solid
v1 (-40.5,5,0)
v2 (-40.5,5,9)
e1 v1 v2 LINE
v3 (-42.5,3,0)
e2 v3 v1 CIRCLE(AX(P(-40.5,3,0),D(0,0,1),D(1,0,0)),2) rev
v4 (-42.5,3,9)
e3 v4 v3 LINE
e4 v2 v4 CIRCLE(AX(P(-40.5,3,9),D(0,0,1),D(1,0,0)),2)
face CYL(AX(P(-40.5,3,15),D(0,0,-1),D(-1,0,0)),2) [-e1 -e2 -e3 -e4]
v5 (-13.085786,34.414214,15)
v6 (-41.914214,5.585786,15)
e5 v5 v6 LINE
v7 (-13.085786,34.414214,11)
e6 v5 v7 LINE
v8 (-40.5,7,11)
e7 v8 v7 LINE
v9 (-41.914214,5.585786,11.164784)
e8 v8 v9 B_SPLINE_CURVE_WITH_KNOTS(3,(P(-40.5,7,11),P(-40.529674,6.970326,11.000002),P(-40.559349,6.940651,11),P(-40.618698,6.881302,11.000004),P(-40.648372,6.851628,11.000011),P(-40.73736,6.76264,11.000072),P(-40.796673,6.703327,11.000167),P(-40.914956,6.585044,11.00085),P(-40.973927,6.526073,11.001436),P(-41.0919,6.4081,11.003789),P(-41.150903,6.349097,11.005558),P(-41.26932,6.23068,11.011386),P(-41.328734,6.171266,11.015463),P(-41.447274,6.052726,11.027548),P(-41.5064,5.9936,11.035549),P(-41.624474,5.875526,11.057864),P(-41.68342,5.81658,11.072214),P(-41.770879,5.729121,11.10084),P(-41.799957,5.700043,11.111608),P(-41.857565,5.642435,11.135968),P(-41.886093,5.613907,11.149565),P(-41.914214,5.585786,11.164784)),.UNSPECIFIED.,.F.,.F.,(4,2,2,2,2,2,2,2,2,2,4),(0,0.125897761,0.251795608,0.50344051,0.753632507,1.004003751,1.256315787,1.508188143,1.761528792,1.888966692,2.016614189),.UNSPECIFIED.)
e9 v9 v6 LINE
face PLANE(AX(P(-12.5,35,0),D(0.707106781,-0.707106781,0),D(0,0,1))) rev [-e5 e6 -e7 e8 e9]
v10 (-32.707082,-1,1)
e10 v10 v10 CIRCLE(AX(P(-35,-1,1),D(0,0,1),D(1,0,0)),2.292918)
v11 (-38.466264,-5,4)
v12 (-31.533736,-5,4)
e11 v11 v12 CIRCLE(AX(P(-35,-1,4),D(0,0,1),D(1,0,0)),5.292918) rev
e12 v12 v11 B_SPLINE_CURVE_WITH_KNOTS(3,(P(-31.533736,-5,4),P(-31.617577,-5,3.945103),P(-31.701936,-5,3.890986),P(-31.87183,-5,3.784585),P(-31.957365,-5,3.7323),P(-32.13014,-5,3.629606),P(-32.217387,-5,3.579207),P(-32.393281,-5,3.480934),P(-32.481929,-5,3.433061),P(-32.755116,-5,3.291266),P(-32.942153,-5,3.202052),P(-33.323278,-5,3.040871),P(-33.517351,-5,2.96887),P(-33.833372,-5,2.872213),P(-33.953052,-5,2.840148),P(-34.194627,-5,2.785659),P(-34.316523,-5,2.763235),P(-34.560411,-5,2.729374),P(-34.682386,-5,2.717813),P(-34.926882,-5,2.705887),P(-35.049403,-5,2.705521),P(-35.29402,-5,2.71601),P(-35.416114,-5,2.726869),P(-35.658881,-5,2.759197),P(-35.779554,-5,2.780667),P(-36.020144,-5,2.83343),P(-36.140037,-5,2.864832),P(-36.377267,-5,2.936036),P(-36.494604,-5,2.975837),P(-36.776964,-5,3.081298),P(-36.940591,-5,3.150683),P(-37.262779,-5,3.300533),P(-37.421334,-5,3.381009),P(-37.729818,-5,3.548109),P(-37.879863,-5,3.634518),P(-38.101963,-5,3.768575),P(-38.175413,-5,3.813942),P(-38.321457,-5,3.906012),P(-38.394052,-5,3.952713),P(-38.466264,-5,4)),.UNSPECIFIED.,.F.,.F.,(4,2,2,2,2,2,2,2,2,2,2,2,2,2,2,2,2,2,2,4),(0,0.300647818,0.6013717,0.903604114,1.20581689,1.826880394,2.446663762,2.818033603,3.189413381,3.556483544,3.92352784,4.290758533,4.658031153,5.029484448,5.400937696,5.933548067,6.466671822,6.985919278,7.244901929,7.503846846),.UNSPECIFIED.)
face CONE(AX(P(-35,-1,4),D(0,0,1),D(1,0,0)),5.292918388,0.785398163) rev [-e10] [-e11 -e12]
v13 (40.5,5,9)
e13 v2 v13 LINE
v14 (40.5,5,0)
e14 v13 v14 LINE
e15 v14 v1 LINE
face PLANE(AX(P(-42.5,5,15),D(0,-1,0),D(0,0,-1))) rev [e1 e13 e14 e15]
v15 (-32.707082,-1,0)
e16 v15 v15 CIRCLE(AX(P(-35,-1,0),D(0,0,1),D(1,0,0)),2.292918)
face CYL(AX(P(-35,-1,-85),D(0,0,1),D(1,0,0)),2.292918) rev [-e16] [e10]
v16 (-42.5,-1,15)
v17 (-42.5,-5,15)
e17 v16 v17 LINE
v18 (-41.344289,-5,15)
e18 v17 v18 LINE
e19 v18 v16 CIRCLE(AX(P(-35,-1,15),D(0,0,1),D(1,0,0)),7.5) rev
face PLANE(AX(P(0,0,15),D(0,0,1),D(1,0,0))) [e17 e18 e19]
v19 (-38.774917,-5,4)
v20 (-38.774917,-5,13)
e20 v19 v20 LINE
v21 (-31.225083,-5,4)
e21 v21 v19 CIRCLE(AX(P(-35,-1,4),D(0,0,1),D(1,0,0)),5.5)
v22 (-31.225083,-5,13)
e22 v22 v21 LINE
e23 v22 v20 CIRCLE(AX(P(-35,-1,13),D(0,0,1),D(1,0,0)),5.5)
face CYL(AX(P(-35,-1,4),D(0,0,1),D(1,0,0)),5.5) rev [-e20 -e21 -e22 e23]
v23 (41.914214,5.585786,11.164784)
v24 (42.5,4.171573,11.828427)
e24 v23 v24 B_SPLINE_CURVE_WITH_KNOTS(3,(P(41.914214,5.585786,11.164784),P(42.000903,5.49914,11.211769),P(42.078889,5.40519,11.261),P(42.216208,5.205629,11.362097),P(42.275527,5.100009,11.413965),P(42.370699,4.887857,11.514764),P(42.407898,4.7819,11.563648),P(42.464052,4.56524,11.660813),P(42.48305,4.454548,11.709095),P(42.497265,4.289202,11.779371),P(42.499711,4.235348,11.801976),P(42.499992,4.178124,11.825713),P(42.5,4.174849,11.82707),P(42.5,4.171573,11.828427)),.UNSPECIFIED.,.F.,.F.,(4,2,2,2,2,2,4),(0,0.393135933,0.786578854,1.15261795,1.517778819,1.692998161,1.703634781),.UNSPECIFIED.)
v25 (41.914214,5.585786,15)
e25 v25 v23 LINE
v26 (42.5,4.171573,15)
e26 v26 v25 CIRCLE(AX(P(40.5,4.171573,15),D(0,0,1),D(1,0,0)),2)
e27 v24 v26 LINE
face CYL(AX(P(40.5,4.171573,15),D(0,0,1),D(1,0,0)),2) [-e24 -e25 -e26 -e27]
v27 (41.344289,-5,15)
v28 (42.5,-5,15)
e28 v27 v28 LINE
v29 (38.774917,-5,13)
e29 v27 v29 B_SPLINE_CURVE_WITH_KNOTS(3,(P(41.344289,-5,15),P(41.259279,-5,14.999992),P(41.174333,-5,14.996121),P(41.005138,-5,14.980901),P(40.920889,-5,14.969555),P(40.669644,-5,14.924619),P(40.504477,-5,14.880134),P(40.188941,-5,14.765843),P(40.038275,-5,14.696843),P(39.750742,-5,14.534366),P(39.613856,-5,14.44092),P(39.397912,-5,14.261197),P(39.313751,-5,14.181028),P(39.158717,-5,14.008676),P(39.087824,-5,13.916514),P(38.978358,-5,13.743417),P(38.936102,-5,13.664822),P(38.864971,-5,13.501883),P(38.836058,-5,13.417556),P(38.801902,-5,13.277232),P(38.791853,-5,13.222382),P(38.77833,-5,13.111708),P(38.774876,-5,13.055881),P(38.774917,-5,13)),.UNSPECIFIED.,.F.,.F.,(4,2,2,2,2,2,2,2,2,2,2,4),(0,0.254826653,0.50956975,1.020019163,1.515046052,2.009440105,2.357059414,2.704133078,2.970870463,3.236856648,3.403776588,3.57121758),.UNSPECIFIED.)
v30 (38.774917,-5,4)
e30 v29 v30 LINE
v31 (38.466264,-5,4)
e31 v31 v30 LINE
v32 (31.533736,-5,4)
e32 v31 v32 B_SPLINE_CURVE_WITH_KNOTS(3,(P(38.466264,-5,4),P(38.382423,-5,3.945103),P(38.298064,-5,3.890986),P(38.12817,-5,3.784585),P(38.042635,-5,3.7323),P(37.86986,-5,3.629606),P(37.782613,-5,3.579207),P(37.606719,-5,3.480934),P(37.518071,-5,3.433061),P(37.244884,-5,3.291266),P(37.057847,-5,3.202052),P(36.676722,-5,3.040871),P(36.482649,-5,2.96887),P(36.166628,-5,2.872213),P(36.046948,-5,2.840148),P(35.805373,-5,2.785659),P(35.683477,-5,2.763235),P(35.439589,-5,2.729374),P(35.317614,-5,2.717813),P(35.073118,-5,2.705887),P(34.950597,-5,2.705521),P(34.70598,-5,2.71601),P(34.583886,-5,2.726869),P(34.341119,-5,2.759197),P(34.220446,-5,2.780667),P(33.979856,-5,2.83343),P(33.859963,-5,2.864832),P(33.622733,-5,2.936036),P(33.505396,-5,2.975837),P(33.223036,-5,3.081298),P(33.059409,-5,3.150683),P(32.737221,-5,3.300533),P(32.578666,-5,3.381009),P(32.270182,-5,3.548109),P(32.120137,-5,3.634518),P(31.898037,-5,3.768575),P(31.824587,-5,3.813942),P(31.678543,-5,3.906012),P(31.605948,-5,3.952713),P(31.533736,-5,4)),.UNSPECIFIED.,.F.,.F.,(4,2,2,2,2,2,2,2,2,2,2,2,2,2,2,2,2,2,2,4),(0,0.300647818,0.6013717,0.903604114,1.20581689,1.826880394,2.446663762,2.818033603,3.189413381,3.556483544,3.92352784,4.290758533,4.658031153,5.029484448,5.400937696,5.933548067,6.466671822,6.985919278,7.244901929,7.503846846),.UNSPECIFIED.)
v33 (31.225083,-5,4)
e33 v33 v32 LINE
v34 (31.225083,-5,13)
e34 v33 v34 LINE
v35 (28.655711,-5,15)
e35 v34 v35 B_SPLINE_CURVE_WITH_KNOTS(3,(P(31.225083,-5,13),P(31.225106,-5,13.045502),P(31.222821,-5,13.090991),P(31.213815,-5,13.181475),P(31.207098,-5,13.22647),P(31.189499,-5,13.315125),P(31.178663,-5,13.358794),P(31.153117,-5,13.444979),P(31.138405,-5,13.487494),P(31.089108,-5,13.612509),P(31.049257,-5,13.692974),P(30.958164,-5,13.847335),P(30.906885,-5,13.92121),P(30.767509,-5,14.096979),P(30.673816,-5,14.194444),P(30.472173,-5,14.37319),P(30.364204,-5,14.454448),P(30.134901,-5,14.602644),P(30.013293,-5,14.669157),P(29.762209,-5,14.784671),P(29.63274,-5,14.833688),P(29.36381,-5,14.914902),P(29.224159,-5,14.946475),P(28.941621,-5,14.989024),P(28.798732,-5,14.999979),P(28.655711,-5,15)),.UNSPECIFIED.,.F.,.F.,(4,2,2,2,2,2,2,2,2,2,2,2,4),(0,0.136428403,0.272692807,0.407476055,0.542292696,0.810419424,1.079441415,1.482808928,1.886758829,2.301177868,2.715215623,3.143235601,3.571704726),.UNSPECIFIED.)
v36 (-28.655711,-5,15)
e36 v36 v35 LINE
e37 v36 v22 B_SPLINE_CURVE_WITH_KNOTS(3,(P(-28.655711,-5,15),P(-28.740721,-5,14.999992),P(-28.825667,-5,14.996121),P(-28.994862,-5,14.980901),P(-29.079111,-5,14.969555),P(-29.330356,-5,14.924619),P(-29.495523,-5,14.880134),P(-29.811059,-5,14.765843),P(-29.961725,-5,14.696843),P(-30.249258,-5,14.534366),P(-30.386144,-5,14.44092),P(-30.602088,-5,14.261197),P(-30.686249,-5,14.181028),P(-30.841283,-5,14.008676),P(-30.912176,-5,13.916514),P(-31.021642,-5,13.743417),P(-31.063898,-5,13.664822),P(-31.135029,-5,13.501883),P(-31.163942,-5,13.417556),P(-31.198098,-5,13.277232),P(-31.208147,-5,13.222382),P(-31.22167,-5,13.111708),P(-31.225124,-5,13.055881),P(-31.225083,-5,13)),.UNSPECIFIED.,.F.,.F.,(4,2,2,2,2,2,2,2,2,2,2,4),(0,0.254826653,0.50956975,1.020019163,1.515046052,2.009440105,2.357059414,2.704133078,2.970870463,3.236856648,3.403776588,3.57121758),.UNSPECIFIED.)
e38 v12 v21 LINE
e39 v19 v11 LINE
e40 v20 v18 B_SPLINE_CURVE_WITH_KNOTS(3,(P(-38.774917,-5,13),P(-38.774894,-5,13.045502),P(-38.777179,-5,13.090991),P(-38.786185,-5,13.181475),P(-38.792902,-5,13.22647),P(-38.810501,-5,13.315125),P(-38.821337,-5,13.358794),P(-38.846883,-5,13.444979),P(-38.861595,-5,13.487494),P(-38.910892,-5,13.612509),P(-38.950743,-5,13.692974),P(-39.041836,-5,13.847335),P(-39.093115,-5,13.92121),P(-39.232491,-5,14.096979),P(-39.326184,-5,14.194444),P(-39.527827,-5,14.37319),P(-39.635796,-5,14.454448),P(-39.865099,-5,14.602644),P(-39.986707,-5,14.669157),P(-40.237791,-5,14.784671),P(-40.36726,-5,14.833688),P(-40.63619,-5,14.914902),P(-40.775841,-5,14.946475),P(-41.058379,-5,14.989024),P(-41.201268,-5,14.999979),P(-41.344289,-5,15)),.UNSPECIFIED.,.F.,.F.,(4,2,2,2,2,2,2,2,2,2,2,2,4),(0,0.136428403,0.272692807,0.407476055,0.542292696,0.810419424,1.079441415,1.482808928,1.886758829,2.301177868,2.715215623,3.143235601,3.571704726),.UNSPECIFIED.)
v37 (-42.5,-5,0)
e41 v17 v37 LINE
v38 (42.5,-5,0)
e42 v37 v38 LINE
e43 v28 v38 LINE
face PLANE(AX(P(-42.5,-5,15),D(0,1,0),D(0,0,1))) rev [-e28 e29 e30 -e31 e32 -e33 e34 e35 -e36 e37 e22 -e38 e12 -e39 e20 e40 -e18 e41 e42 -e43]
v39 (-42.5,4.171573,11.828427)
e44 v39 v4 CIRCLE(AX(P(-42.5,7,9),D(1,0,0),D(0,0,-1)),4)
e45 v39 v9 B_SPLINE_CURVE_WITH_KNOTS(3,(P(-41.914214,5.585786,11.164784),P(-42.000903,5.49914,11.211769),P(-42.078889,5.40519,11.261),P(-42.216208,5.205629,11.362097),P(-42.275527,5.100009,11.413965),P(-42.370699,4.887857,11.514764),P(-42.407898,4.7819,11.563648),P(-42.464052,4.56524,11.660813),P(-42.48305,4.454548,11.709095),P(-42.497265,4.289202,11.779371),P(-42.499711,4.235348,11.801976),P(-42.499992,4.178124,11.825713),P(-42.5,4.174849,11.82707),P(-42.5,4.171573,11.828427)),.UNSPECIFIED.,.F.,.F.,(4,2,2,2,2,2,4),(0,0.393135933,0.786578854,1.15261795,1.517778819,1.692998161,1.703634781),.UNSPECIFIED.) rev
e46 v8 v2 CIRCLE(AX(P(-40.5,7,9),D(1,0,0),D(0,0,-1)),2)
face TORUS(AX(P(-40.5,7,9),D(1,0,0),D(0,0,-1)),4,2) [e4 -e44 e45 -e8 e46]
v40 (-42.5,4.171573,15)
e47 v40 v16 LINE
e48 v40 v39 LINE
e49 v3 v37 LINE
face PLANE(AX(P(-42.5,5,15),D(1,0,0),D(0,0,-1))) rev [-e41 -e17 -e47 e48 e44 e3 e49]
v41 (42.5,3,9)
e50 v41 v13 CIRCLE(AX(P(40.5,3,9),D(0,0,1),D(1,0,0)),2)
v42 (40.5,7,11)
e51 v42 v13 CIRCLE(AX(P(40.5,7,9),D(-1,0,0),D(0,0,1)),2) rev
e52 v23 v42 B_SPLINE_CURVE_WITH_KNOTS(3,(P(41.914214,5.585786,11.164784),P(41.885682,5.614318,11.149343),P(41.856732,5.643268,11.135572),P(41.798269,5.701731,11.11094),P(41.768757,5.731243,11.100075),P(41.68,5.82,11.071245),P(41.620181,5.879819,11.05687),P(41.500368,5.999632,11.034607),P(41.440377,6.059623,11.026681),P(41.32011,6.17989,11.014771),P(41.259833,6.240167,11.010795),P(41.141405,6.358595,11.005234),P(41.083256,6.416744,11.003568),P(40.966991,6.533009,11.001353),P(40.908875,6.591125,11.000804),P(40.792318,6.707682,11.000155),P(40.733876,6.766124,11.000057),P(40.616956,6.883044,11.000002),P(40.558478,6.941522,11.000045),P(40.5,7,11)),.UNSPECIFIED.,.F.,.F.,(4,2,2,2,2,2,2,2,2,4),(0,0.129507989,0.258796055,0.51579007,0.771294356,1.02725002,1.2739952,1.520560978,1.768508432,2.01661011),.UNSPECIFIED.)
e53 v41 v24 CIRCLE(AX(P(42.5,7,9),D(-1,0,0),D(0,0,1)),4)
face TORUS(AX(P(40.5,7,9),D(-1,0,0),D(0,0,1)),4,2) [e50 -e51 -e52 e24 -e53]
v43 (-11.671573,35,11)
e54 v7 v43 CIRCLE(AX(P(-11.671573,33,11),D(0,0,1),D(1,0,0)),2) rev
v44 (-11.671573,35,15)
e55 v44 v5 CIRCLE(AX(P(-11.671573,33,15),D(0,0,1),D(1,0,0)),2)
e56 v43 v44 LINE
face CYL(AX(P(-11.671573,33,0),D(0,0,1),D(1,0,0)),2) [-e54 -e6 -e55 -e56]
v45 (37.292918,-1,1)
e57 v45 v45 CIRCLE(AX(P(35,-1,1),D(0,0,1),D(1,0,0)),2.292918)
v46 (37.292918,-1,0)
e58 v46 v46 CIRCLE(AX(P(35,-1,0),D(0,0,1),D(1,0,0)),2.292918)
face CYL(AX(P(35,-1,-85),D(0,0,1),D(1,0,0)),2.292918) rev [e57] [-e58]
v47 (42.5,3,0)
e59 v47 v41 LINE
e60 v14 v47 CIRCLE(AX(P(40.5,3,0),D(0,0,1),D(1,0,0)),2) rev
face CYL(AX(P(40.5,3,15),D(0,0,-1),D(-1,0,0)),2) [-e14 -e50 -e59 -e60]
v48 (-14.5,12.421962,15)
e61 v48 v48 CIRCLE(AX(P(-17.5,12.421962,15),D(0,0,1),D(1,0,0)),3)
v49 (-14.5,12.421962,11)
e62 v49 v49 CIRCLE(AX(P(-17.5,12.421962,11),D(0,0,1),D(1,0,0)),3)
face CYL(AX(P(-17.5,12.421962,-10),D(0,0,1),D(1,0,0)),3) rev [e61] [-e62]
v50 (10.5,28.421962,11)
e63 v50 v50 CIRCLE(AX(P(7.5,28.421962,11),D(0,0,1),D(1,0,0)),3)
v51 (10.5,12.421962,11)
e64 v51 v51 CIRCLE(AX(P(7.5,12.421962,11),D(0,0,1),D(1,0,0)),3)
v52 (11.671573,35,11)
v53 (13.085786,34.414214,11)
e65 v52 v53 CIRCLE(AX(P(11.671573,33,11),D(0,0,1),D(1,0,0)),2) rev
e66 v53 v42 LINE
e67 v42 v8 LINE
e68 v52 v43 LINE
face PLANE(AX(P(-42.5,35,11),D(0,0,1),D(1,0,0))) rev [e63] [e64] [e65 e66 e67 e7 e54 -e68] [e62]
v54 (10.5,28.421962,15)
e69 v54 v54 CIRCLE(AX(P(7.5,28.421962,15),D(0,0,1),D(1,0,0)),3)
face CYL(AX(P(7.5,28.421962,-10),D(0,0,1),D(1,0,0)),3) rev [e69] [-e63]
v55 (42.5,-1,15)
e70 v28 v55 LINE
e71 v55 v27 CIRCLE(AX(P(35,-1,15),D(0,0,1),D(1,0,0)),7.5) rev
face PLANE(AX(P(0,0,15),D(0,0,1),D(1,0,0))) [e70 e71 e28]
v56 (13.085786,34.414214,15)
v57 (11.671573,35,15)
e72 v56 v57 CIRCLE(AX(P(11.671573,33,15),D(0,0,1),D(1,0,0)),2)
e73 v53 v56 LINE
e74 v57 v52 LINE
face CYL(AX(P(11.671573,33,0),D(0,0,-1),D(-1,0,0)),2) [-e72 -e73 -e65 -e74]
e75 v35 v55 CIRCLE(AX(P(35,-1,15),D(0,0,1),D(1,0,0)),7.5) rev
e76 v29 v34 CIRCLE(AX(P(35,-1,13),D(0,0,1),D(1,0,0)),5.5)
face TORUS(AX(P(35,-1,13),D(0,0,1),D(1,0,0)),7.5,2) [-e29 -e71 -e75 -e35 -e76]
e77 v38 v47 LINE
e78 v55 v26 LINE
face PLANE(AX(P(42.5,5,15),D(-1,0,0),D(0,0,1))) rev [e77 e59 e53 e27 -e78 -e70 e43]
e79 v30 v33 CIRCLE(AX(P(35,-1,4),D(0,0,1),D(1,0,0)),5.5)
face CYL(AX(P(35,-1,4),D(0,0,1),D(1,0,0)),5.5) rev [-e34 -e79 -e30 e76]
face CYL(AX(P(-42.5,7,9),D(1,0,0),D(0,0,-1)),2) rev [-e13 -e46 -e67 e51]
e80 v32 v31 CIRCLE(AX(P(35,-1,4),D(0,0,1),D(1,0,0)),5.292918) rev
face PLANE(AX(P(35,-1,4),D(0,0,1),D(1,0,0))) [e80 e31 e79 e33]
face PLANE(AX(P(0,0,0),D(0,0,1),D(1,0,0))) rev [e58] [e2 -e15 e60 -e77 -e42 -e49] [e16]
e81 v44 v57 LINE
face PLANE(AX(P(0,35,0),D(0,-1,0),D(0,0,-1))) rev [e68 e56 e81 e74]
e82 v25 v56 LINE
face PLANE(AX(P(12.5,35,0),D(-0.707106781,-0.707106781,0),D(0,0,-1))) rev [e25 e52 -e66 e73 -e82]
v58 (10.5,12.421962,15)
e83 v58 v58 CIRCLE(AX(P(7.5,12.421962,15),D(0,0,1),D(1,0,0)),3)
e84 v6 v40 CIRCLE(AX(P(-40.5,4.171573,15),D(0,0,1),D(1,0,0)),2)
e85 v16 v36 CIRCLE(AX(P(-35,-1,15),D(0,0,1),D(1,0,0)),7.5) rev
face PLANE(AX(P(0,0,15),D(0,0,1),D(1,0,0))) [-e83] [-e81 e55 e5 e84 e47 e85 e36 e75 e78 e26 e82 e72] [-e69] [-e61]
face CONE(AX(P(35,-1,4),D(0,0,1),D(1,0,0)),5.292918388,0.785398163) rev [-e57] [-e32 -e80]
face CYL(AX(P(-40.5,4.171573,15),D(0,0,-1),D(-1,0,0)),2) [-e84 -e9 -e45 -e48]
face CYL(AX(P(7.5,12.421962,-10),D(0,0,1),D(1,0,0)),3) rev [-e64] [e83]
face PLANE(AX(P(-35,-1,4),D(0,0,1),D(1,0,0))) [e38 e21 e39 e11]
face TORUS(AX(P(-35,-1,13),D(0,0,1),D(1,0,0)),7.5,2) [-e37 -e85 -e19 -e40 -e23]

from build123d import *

# Parameters (mm, degrees)
SKETCH1_W           = 85
SKETCH1_H           = 10
BOSS_EXTRUDE1_DEPTH = 15
SKETCH3_R           = 2.292918
CUT_EXTRUDE1_DEPTH  = 100
LPATTERN1_COUNT     = 2
LPATTERN1_PITCH     = 70
SKETCH7_W           = 85
SKETCH7_H           = 4
BOSS_EXTRUDE5_DEPTH = 30
SKETCH8_R           = 3
CUT_EXTRUDE2_DEPTH  = 25
LPATTERN2_START     = 11
LPATTERN2_OUTLINE_R = 3
LPATTERN2_DEPTH     = 4
CHAMFER2_SIZE       = 30
FILLET3_START       = -1
FILLET3_DEPTH       = 10
FILLET3_START_2     = 1.5411
FILLET3_2_DEPTH     = 14.4589
FILLET3_START_3     = 9
FILLET3_3_DEPTH     = 2.164784
FILLET3_5_DEPTH     = 2
FILLET3_START_4     = 11
FILLET3_6_OUTLINE_R = 3
FILLET3_6_DEPTH     = 0.164784
SKETCH9_R           = 5.5
CUT_EXTRUDE7_DEPTH  = 11
LPATTERN3_COUNT     = 2
LPATTERN3_PITCH     = 70
CHAMFER3_SIZE       = 3
FILLET4_R           = 2


with BuildPart() as part:
    # Sketch1 → Boss-Extrude1 (new body)
    with BuildSketch(Plane.XY):
        Rectangle(SKETCH1_W, SKETCH1_H)
    extrude(amount=BOSS_EXTRUDE1_DEPTH)

    # Sketch3 → Cut-Extrude1 (cut)
    with BuildSketch(Plane.XY.offset(15)):
        with Locations((-35, -1)):
            Circle(SKETCH3_R)
    cut_extrude1 = extrude(amount=-CUT_EXTRUDE1_DEPTH, mode=Mode.SUBTRACT)

    # LPattern1: Cut-Extrude1 ×2
    with Locations(*[(i * LPATTERN1_PITCH, 0, 0) for i in range(1, LPATTERN1_COUNT)]):
        add(cut_extrude1, mode=Mode.SUBTRACT)

    # Sketch7 → Boss-Extrude5 (add)
    with BuildSketch(Plane(origin=(0, 5, 0), x_dir=(1, 0, 0), z_dir=(0, 1, 0))):
        with Locations((0, -13)):
            Rectangle(SKETCH7_W, SKETCH7_H)
    extrude(amount=BOSS_EXTRUDE5_DEPTH)

    # Sketch8 → Cut-Extrude2 (cut)
    with BuildSketch(Plane.XY.offset(15)):
        with Locations((7.5, 12.421962)):
            Circle(SKETCH8_R)
    extrude(amount=-CUT_EXTRUDE2_DEPTH, mode=Mode.SUBTRACT)

    # LPattern2: read off the stored shape, not the designer's step
    # LPattern2 outline → LPattern2 (cut)
    with BuildSketch(Plane.XY.offset(LPATTERN2_START)):
        with Locations((-17.5, 12.421962)):
            Circle(LPATTERN2_OUTLINE_R)
        with Locations((7.5, 28.421962)):
            Circle(LPATTERN2_OUTLINE_R)
    extrude(amount=LPATTERN2_DEPTH, mode=Mode.SUBTRACT)

    # Chamfer2
    chamfer2_edges = [part.edges().sort_by_distance(p)[0] for p in [
        (42.5, 35, 13),
        (-42.5, 35, 13),
    ]]
    chamfer(chamfer2_edges, length=CHAMFER2_SIZE)

    # Fillet3: read off the stored shape, not the designer's step
    # Fillet3 outline → Fillet3 (cut)
    with BuildSketch(Plane.XY.offset(FILLET3_START)):
        with BuildLine():
            ThreePointArc((40.5, 5), (41.914214, 4.414214), (42.5, 3))
            Line((42.5, 3), (42.5, 5))
            Line((42.5, 5), (40.5, 5))
        make_face()
        with BuildLine():
            ThreePointArc((-42.5, 3), (-41.914214, 4.414214), (-40.5, 5))
            Line((-40.5, 5), (-42.5, 5))
            Line((-42.5, 5), (-42.5, 3))
        make_face()
    extrude(amount=FILLET3_DEPTH, mode=Mode.SUBTRACT)

    # Fillet3 2 outline → Fillet3 2 (cut)
    with BuildSketch(Plane.XY.offset(FILLET3_START_2)):
        with BuildLine():
            Line((42.5, 4.171573), (42.5, 5))
            Line((42.5, 5), (41.914214, 5.585786))
            ThreePointArc((41.914214, 5.585786), (42.347759, 4.93694), (42.5, 4.171573))
        make_face()
        with BuildLine():
            Line((-41.914214, 5.585786), (-42.5, 5))
            Line((-42.5, 5), (-42.5, 4.171573))
            ThreePointArc((-42.5, 4.171573), (-42.347759, 4.93694), (-41.914214, 5.585786))
        make_face()
        with BuildLine():
            ThreePointArc((11.671573, 35), (12.43694, 34.847759), (13.085786, 34.414214))
            Line((13.085786, 34.414214), (12.5, 35))
            Line((12.5, 35), (11.671573, 35))
        make_face()
        with BuildLine():
            Line((-12.5, 35), (-13.085786, 34.414214))
            ThreePointArc((-13.085786, 34.414214), (-12.43694, 34.847759), (-11.671573, 35))
            Line((-11.671573, 35), (-12.5, 35))
        make_face()
    extrude(amount=FILLET3_2_DEPTH, mode=Mode.SUBTRACT)

    # Fillet3 3 outline → Fillet3 3 (add)
    with BuildSketch(Plane.XY.offset(FILLET3_START_3)):
        with BuildLine():
            Line((-42.320359, 5), (42.320359, 5))
            ThreePointArc((42.320359, 5), (42.143594, 5.311133), (41.914214, 5.585786))
            Line((41.914214, 5.585786), (13.085786, 34.414214))
            ThreePointArc((13.085786, 34.414214), (12.43694, 34.847759), (11.671573, 35))
            Line((11.671573, 35), (-11.671573, 35))
            ThreePointArc((-11.671573, 35), (-12.43694, 34.847759), (-13.085786, 34.414214))
            Line((-13.085786, 34.414214), (-41.914214, 5.585786))
            ThreePointArc((-41.914214, 5.585786), (-42.143594, 5.311133), (-42.320359, 5))
        make_face()
    extrude(amount=FILLET3_3_DEPTH)

    # Fillet3 4 outline → Fillet3 4 (revolve, cut)
    with BuildSketch(Plane(origin=(0, 7, 9), x_dir=(0, 1, 0), z_dir=(0, 0, -1))):
        with BuildLine():
            Line((4, 42.5), (0, 42.5))
            Line((0, 42.5), (0, -42.5))
            Line((0, -42.5), (4, -42.5))
            ThreePointArc((4, -42.5), (2.585786, -41.914214), (2, -40.5))
            Line((2, -40.5), (2, 40.5))
            ThreePointArc((2, 40.5), (2.585786, 41.914214), (4, 42.5))
        make_face()
    revolve(axis=Axis((0, 7, 9), (1, 0, 0)), mode=Mode.SUBTRACT)

    # Fillet3 5 outline → Fillet3 5 (cut)
    with BuildSketch(Plane.XY.offset(FILLET3_START_3)):
        with BuildLine():
            Line((11.671573, 35), (-11.671573, 35))
            ThreePointArc((-11.671573, 35), (-12.43694, 34.847759), (-13.085786, 34.414214))
            Line((-13.085786, 34.414214), (-40.5, 7))
            Line((-40.5, 7), (40.5, 7))
            Line((40.5, 7), (13.085786, 34.414214))
            ThreePointArc((13.085786, 34.414214), (12.43694, 34.847759), (11.671573, 35))
        make_face()
    extrude(amount=FILLET3_5_DEPTH, mode=Mode.SUBTRACT)

    # Fillet3 6 outline → Fillet3 6 (cut)
    with BuildSketch(Plane.XY.offset(FILLET3_START_4)):
        with Locations((7.5, 28.421962)):
            Circle(FILLET3_6_OUTLINE_R)
        with Locations((7.5, 12.421962)):
            Circle(FILLET3_6_OUTLINE_R)
        with Locations((-17.5, 12.421962)):
            Circle(FILLET3_6_OUTLINE_R)
    extrude(amount=FILLET3_6_DEPTH, mode=Mode.SUBTRACT)

    # Sketch9 → Cut-Extrude7 (cut)
    with BuildSketch(Plane.XY.offset(15)):
        with Locations((-35, -1)):
            Circle(SKETCH9_R)
    cut_extrude7 = extrude(amount=-CUT_EXTRUDE7_DEPTH, mode=Mode.SUBTRACT)

    # LPattern3: Cut-Extrude7 ×2
    with Locations(*[(i * LPATTERN3_PITCH, 0, 0) for i in range(1, LPATTERN3_COUNT)]):
        add(cut_extrude7, mode=Mode.SUBTRACT)

    # Chamfer3
    # the kernel refuses this chamfer: 3 mm, written as the material it takes off along each edge
    with BuildSketch(Plane(origin=(-35, -1, 4), x_dir=(1, 0, 0), z_dir=(0, -1, 0))) as chamfer3_piece_1:
        Polygon((2.292918 + CHAMFER3_SIZE, 0), (2.292918, -CHAMFER3_SIZE), (2.292918, 0), align=None)
    revolve(axis=Axis((-35, -1, 4), (0, 0, 1)), mode=Mode.SUBTRACT)
    with BuildSketch(Plane(origin=(35, -1, 4), x_dir=(1, 0, 0), z_dir=(0, -1, 0))) as chamfer3_piece_2:
        Polygon((2.292918 + CHAMFER3_SIZE, 0), (2.292918, -CHAMFER3_SIZE), (2.292918, 0), align=None)
    revolve(axis=Axis((35, -1, 4), (0, 0, 1)), mode=Mode.SUBTRACT)

    # Fillet4
    fillet4_edges = [part.edges().sort_by_distance(p)[0] for p in [
        (-35, 4.5, 15),
        (35, 4.5, 15),
    ]]
    fillet(fillet4_edges, radius=FILLET4_R - 0.0001)  # a hair under: the kernel refuses the full size


solid = part.part
